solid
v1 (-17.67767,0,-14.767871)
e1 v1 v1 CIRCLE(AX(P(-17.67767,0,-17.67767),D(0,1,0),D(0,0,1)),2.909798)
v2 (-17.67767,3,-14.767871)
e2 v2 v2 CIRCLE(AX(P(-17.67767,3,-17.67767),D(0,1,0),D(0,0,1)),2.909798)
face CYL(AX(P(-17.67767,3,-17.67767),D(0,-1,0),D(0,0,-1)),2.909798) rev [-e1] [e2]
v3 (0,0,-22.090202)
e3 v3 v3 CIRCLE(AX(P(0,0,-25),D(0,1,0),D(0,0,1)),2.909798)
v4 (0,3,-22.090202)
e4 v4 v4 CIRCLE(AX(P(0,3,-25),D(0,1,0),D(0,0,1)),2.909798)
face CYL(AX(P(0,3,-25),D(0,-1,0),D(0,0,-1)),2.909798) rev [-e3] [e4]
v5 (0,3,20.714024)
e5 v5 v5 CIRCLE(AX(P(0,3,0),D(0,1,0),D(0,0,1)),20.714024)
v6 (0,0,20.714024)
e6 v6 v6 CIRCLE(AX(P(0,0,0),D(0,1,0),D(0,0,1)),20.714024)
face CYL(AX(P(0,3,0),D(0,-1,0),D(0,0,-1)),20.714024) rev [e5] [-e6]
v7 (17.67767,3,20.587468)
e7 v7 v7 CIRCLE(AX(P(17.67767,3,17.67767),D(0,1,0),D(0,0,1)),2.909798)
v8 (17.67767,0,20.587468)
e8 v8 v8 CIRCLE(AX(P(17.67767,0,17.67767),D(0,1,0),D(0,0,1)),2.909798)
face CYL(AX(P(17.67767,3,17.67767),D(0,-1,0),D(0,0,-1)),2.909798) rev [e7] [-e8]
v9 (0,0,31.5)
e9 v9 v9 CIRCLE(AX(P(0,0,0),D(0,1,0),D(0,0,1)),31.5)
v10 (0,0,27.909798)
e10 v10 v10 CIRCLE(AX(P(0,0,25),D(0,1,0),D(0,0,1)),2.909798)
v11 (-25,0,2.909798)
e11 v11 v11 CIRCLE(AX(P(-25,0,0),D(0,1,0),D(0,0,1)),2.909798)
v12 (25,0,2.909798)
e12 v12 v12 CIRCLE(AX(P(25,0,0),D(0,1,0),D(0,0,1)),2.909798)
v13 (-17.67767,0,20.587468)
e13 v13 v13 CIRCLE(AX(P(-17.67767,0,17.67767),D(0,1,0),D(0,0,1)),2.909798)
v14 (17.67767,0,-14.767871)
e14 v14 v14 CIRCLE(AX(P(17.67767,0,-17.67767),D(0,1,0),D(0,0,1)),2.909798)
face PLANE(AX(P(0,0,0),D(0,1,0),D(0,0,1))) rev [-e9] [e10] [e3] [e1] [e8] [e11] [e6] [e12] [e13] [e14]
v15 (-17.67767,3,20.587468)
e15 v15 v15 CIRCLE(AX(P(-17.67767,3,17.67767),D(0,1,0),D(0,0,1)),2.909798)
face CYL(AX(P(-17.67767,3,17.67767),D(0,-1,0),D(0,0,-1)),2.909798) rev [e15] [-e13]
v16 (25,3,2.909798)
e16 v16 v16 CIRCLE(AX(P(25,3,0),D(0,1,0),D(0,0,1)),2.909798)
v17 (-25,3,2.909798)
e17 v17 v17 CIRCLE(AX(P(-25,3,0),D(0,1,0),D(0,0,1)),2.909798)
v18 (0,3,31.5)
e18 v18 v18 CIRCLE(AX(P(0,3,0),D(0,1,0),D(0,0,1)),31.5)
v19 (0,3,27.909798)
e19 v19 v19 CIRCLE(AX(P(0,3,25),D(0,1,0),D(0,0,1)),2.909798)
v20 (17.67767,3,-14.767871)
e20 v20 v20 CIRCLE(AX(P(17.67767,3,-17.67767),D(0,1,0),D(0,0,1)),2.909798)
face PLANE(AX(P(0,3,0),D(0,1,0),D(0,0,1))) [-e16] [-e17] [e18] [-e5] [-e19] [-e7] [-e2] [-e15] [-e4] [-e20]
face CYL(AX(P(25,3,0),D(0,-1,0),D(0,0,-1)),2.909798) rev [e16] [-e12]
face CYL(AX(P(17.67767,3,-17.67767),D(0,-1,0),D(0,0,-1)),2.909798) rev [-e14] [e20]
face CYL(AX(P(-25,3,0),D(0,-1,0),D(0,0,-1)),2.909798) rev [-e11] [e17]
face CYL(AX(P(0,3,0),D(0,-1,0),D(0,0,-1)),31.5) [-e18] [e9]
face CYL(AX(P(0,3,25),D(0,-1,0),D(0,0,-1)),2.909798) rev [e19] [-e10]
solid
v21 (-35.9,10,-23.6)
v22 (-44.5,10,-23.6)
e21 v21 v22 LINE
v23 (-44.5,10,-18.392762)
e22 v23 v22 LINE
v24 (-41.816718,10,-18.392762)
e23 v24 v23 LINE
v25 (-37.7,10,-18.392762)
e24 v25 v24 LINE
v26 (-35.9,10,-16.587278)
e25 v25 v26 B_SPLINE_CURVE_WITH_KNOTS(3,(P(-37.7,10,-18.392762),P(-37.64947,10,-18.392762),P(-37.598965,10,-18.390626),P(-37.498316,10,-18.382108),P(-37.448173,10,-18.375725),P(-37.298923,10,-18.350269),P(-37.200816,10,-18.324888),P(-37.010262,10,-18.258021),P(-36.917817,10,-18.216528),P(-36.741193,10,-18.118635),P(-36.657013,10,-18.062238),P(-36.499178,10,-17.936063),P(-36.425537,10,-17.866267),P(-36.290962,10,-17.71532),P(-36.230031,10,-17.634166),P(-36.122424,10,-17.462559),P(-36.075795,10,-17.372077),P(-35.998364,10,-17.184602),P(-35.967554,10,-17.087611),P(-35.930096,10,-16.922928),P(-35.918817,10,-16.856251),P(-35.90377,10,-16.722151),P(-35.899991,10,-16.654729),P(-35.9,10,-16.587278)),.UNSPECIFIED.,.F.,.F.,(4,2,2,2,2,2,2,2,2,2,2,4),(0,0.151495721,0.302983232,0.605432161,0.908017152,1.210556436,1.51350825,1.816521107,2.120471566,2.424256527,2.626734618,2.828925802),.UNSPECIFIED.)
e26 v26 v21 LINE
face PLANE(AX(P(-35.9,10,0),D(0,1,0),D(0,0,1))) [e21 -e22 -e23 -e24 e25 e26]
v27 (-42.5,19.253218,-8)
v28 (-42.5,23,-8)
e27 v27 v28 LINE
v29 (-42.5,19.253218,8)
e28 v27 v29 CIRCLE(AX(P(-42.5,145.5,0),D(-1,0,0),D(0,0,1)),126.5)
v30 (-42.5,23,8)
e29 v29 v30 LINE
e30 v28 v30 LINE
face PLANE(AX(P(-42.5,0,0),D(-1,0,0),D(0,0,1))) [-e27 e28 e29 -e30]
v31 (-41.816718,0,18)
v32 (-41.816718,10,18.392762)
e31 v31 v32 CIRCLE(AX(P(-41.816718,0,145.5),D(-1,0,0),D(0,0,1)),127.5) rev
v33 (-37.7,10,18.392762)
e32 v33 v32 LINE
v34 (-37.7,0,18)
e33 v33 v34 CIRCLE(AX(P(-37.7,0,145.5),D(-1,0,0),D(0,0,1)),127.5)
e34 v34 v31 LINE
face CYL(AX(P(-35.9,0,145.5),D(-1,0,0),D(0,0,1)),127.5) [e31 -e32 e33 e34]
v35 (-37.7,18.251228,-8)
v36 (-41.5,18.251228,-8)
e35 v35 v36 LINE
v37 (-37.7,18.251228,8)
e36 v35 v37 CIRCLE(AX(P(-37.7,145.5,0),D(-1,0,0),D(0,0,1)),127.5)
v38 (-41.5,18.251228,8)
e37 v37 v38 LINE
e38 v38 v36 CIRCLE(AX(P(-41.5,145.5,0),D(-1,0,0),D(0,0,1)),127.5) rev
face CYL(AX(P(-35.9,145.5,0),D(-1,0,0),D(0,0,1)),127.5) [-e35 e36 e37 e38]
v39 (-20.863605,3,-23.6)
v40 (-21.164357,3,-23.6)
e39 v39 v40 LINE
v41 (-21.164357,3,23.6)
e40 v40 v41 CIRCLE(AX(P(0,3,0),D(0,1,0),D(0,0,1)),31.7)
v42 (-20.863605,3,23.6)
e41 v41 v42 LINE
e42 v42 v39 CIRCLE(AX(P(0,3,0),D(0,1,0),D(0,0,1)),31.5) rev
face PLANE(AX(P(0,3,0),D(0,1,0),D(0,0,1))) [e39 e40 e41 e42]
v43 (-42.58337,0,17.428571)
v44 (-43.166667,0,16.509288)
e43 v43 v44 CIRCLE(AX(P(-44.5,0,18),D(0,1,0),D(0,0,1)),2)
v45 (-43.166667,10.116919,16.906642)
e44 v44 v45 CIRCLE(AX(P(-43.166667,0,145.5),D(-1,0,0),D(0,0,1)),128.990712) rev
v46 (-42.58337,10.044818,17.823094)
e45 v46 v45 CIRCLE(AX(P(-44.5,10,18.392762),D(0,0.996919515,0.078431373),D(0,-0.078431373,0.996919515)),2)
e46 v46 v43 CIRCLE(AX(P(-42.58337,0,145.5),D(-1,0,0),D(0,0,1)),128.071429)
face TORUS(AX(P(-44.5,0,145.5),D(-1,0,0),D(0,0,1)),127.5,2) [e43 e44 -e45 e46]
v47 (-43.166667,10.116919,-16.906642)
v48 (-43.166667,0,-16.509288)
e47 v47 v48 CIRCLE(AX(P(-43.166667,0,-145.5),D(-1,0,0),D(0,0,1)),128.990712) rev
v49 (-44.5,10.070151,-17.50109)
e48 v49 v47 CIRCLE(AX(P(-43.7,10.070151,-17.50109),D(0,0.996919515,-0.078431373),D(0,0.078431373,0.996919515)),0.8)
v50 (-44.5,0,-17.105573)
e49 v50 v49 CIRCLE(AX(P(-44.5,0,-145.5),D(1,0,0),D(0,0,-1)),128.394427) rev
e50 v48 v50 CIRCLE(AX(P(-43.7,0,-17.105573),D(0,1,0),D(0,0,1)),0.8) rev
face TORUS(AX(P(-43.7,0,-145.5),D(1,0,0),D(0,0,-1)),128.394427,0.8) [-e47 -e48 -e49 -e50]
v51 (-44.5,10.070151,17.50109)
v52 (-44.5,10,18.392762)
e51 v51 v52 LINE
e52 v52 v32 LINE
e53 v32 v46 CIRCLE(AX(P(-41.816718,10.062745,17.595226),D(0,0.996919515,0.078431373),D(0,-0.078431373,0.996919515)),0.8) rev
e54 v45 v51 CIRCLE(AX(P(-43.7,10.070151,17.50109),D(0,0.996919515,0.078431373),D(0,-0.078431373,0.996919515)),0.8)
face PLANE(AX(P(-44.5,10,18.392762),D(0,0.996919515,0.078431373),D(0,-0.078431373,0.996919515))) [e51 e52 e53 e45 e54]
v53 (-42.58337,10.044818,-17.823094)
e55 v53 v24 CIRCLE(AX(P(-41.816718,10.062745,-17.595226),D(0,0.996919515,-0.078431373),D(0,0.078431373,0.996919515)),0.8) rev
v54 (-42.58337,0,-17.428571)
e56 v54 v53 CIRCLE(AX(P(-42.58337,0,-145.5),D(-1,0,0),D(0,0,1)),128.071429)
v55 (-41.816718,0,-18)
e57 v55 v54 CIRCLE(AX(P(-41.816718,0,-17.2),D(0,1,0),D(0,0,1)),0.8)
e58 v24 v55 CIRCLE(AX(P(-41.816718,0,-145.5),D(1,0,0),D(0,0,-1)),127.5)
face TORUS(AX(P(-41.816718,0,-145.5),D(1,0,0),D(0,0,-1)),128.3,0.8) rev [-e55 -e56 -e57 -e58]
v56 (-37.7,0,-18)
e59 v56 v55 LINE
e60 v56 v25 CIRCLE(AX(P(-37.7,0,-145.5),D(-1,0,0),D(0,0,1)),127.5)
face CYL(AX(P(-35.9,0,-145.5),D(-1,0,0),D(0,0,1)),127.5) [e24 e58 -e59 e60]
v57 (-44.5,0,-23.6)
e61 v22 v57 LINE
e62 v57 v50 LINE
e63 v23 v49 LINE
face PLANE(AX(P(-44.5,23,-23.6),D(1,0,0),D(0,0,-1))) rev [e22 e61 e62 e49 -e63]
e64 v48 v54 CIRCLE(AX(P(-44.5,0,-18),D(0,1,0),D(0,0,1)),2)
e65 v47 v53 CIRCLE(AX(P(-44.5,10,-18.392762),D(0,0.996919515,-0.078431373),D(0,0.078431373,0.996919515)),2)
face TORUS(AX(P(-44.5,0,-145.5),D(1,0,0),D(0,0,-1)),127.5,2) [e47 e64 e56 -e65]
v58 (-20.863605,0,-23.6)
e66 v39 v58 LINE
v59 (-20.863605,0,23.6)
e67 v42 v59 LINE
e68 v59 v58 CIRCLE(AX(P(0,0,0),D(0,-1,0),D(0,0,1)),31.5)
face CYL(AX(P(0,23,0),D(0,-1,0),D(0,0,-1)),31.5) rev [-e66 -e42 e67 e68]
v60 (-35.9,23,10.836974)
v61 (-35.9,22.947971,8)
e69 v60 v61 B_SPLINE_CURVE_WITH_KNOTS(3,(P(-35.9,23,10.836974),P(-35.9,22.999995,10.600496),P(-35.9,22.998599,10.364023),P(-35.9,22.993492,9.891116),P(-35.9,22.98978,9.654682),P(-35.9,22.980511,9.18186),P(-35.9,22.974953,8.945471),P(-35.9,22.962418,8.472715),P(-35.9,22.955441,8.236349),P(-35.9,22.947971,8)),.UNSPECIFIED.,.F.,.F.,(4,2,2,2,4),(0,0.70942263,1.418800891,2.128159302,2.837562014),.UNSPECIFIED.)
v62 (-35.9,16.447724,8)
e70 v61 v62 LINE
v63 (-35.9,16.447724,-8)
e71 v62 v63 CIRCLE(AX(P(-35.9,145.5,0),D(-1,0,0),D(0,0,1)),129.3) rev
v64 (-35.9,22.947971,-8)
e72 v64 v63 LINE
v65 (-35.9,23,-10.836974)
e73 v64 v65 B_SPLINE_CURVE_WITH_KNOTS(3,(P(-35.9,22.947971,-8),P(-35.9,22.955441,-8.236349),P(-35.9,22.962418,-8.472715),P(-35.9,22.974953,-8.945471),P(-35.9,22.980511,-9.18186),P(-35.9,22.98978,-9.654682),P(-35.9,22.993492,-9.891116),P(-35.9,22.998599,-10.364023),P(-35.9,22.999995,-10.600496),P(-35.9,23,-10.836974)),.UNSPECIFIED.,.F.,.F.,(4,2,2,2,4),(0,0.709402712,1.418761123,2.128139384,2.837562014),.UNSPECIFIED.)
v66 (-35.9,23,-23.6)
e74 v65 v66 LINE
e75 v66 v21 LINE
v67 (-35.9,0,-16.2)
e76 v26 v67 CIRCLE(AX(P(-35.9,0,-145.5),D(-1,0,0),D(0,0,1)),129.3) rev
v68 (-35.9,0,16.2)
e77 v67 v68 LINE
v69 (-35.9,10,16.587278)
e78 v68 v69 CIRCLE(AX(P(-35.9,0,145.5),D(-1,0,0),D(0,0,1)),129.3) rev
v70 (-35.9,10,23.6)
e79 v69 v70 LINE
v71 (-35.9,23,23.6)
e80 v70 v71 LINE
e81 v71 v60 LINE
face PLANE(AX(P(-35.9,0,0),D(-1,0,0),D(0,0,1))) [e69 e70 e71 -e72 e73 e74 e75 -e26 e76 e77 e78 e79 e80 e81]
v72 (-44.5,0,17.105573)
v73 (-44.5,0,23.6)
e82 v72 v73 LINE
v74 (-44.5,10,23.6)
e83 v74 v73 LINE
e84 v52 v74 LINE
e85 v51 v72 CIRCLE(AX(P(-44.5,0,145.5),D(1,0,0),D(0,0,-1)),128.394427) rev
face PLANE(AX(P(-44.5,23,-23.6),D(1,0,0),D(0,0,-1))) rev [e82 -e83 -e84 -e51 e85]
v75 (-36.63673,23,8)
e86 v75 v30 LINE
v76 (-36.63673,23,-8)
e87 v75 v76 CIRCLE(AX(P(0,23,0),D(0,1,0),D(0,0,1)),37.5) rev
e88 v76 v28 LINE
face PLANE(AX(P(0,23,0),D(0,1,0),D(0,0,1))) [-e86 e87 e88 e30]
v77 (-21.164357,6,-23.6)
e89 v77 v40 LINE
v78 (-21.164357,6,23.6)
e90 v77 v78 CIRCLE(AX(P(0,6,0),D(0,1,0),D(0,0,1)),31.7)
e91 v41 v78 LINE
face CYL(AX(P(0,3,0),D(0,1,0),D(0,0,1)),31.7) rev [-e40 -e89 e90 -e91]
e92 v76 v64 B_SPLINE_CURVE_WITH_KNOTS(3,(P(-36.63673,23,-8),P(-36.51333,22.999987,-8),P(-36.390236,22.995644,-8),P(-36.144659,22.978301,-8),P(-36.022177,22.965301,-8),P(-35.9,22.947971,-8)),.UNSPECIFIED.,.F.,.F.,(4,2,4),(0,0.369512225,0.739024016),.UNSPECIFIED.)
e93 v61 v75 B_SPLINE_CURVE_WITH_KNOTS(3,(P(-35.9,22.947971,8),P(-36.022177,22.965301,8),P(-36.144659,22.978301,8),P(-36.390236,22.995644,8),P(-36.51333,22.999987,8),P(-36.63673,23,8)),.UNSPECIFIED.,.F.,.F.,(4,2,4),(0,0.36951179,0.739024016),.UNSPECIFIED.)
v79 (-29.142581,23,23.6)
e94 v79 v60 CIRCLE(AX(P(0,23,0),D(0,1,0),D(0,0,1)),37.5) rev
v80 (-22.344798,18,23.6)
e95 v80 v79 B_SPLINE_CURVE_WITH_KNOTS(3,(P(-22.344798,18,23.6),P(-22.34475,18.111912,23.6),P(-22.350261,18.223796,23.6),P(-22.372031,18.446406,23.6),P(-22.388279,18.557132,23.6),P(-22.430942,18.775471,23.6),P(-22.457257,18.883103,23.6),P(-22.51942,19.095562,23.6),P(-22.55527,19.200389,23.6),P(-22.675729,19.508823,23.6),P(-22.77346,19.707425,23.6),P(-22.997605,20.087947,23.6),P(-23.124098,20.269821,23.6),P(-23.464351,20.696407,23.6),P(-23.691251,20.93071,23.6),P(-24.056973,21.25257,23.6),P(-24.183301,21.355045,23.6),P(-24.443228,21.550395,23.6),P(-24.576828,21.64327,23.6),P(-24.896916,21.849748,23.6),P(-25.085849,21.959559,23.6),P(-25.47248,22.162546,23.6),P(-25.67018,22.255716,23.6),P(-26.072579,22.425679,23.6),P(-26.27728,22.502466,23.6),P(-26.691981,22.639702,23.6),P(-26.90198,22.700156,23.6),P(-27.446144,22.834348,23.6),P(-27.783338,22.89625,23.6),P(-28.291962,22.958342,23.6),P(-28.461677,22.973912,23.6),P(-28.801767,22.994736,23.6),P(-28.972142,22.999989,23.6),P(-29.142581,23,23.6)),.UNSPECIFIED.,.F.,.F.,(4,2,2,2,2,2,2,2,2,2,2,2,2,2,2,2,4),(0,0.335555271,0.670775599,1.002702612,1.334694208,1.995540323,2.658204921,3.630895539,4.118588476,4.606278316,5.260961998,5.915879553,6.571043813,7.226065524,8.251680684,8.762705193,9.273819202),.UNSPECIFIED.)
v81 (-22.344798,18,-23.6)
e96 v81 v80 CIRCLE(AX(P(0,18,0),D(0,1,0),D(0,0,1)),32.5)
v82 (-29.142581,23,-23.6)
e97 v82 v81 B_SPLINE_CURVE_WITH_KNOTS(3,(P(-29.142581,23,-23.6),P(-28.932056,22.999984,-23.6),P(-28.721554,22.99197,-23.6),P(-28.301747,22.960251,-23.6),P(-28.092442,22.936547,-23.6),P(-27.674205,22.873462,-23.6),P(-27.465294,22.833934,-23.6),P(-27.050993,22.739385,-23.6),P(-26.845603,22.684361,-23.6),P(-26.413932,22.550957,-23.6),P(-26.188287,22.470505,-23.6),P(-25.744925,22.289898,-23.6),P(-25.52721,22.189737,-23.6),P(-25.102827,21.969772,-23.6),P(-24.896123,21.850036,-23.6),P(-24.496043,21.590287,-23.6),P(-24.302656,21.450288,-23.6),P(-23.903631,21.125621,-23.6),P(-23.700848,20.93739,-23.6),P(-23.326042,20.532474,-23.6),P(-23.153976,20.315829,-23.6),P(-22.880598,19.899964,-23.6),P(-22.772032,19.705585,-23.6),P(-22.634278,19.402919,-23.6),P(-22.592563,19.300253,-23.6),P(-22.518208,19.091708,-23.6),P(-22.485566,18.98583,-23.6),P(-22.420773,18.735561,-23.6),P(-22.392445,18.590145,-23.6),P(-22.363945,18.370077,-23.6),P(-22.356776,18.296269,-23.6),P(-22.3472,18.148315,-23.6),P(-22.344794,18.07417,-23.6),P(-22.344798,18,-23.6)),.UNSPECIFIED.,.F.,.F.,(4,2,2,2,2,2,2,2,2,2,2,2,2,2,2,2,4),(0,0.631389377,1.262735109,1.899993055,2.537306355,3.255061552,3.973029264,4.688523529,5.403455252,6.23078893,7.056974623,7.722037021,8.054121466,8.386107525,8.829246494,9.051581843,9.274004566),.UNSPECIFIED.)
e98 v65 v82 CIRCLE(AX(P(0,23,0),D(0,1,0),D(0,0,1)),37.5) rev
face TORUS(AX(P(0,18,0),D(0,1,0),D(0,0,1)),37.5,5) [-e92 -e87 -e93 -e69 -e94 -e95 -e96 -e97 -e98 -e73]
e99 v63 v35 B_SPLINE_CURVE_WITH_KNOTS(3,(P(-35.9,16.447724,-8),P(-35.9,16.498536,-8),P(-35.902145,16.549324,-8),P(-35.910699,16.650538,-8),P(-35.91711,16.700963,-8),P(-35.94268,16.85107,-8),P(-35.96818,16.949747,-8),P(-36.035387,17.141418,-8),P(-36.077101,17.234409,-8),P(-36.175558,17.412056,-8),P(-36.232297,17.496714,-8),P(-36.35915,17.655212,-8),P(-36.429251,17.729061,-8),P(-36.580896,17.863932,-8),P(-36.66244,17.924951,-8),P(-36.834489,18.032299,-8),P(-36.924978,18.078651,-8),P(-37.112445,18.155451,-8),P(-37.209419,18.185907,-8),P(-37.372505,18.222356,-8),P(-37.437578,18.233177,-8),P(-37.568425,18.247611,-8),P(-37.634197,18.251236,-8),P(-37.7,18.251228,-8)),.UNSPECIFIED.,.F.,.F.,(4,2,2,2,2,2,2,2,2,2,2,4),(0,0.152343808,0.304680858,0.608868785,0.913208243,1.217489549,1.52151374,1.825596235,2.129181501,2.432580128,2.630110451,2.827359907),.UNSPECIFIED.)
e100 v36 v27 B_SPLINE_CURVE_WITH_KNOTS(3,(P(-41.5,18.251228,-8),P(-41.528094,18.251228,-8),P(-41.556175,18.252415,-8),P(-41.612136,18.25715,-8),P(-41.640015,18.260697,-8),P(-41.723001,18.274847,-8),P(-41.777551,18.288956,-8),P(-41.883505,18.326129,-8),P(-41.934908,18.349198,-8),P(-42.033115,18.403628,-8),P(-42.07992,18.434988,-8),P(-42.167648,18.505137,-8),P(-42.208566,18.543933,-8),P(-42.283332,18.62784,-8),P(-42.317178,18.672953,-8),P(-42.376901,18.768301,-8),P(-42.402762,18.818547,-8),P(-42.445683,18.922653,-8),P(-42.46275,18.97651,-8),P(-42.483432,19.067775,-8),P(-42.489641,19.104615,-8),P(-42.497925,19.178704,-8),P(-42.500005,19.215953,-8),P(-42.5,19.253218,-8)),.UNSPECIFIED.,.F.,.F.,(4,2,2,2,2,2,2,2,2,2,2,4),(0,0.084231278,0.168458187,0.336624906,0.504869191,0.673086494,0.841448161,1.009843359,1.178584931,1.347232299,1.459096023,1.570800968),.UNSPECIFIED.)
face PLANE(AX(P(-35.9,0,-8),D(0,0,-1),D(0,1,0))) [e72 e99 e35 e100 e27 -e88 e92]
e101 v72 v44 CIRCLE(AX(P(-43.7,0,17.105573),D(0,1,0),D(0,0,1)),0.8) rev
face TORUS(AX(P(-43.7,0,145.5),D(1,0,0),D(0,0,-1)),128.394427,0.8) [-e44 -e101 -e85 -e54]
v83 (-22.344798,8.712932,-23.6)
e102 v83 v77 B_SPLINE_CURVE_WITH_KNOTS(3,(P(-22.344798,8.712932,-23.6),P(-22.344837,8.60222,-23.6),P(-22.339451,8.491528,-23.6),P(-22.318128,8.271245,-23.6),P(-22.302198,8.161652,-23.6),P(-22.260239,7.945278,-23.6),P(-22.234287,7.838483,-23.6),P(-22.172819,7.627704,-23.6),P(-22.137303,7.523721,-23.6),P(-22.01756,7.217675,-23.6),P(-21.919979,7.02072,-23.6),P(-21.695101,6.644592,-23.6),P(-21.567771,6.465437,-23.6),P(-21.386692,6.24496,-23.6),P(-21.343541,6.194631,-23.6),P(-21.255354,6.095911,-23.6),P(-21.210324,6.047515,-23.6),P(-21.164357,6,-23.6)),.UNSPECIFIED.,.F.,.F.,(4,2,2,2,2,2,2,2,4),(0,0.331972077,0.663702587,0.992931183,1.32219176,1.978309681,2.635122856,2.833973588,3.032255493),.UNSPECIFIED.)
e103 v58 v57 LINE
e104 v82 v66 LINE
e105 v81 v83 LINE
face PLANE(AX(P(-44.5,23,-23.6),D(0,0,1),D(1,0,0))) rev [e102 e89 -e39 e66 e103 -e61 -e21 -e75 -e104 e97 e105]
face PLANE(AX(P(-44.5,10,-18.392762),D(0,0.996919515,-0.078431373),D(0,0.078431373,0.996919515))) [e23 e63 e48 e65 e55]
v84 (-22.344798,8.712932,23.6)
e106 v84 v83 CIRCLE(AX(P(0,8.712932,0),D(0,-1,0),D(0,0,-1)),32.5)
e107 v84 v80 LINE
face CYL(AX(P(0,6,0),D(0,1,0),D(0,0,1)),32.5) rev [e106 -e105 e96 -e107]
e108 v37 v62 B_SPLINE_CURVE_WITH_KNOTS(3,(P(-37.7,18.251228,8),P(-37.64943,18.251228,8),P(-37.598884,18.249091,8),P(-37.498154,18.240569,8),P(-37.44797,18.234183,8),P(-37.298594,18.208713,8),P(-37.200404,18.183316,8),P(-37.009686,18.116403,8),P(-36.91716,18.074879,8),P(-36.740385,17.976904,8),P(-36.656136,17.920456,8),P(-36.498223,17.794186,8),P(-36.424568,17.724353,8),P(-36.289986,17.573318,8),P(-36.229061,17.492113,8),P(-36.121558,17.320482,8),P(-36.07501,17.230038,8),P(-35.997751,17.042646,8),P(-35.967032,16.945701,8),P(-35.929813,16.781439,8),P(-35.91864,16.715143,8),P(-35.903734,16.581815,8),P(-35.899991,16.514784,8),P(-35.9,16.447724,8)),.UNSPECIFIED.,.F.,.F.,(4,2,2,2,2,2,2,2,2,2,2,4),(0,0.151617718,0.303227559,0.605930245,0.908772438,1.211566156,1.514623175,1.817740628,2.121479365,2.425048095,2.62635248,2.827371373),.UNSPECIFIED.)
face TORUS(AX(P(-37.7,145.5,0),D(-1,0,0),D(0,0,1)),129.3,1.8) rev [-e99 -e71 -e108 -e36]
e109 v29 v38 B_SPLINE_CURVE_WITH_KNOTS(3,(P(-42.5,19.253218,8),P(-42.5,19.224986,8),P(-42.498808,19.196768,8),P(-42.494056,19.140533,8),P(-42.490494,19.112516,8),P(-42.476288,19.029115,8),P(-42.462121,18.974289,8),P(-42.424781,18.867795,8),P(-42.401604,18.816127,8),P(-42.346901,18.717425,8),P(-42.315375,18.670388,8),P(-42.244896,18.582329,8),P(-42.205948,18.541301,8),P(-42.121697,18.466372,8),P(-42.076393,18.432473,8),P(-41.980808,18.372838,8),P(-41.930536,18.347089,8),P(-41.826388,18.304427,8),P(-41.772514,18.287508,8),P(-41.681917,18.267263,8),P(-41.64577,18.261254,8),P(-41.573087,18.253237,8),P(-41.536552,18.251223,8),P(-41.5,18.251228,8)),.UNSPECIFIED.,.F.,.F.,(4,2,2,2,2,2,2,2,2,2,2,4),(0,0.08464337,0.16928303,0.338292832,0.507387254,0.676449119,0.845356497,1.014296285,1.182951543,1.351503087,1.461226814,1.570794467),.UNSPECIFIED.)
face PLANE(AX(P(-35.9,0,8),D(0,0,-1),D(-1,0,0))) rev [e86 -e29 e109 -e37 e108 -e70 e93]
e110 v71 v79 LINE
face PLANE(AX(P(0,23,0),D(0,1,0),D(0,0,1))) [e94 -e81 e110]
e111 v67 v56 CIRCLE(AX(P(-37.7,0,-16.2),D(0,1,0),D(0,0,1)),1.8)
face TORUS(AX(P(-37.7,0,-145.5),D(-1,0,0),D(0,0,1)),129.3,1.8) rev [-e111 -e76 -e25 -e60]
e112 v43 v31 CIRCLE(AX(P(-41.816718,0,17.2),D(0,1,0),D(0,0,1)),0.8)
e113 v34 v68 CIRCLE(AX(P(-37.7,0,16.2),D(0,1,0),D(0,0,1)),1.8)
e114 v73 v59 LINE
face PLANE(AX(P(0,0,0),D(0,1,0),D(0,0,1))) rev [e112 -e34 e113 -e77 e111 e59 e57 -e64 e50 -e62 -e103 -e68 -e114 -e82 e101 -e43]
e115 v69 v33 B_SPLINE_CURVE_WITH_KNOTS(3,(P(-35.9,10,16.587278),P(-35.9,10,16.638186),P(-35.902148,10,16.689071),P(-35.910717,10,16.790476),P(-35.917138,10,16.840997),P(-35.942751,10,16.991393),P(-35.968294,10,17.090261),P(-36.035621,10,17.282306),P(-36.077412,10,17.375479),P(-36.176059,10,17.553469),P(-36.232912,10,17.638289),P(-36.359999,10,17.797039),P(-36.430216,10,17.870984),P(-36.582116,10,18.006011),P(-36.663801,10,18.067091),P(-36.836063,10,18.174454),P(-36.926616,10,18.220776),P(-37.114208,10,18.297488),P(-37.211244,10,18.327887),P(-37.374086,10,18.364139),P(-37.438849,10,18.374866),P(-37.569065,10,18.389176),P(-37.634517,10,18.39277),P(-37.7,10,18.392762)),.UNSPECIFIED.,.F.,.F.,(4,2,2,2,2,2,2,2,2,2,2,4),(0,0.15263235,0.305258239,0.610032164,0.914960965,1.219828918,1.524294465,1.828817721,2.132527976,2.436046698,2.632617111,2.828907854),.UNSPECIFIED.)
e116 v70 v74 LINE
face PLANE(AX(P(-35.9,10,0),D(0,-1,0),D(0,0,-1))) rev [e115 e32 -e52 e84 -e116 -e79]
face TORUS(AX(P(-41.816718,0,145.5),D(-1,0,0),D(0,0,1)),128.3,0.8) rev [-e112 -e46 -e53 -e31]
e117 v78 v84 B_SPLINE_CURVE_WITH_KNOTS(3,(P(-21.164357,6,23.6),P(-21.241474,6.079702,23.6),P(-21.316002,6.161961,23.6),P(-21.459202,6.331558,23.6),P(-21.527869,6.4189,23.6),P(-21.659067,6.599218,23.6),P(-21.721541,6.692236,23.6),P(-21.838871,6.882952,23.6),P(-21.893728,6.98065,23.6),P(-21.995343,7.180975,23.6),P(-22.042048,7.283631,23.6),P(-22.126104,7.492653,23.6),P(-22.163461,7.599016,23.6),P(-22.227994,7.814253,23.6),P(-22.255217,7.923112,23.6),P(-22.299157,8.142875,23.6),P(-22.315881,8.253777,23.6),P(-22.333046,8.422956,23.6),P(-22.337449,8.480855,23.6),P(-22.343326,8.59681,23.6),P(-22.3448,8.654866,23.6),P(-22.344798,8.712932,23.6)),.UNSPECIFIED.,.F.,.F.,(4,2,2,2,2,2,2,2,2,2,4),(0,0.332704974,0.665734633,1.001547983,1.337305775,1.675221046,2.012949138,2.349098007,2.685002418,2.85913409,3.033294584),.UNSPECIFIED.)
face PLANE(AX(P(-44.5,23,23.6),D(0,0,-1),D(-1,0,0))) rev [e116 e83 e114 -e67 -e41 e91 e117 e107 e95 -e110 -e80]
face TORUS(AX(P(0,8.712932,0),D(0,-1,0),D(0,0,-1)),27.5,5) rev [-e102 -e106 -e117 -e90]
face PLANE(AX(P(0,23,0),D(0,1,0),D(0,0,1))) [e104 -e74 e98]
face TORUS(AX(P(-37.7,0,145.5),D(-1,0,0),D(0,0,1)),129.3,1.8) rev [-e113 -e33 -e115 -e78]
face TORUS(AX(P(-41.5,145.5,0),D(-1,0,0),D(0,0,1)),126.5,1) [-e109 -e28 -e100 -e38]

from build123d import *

# Parameters (mm, degrees)
SKETCH_1_R          = 31.5
SKETCH_1_R_2        = 20.714023716
SKETCH_1_R_3        = 2.909798399
EXTRUDE_1_DEPTH     = 3
EXTRUDE_2_DEPTH     = 23
CUT_EXTRUDE_1_DEPTH = 8.6
SKETCH_5_R          = 32.5
CUT_EXTRUDE_2_DEPTH = 17
FILLET_1_R          = 5
FILLET_2_R          = 1.8
FILLET_4_R          = 0.8
FILLET_5_R          = 0.8
SKETCH_8_W          = 38.793065546
SKETCH_8_H          = 19.973810534
CUT_EXTRUDE_3_DEPTH = 2
FILLET_6_R          = 1
SKETCH_9_R          = 31.7
CUT_EXTRUDE_4_DEPTH = 3
FILLET_7_R          = 5


with BuildPart() as part:
    # 草图1 → 凸台-拉伸1 (new body)
    with BuildSketch(Plane(origin=(0, 0, 0), x_dir=(1, 0, 0), z_dir=(0, 1, 0))):
        with Locations(Location((0, 0, 0), (0, 0, 270))):
            Circle(SKETCH_1_R)
        with Locations(Location((0, 0, 0), (0, 0, 270))):
            Circle(SKETCH_1_R_2, mode=Mode.SUBTRACT)
        with Locations(Location((0, -25, 0), (0, 0, 270))):
            Circle(SKETCH_1_R_3, mode=Mode.SUBTRACT)
        with Locations(Location((-17.67766953, -17.67766953, 0), (0, 0, 270))):
            Circle(SKETCH_1_R_3, mode=Mode.SUBTRACT)
        with Locations(Location((-25, 0, 0), (0, 0, 270))):
            Circle(SKETCH_1_R_3, mode=Mode.SUBTRACT)
        with Locations(Location((-17.67766953, 17.67766953, 0), (0, 0, 270))):
            Circle(SKETCH_1_R_3, mode=Mode.SUBTRACT)
        with Locations(Location((0, 25, 0), (0, 0, 270))):
            Circle(SKETCH_1_R_3, mode=Mode.SUBTRACT)
        with Locations(Location((17.67766953, 17.67766953, 0), (0, 0, 270))):
            Circle(SKETCH_1_R_3, mode=Mode.SUBTRACT)
        with Locations(Location((25, 0, 0), (0, 0, 270))):
            Circle(SKETCH_1_R_3, mode=Mode.SUBTRACT)
        with Locations(Location((17.67766953, -17.67766953, 0), (0, 0, 270))):
            Circle(SKETCH_1_R_3, mode=Mode.SUBTRACT)
    extrude(amount=EXTRUDE_1_DEPTH)


with BuildPart() as body_2:
    # 草图2 → 凸台-拉伸2 (new body)
    with BuildSketch(Plane(origin=(0, 0, 0), x_dir=(1, 0, 0), z_dir=(0, 1, 0))):
        with BuildLine():
            Line((-44.5, 23.6), (-44.5, -23.6))
            Line((-44.5, -23.6), (-20.863604674, -23.6))
            ThreePointArc((-20.863604674, -23.6), (-31.5, 0), (-20.863604674, 23.6))
            Line((-20.863604674, 23.6), (-44.5, 23.6))
        make_face()
    extrude(amount=EXTRUDE_2_DEPTH)

    # 草图3 → 切除-拉伸1 (cut)
    with BuildSketch(Plane.ZY.offset(44.5)):
        with BuildLine():
            Line((-8, 18.251227904), (-8, 23))
            Line((-8, 23), (-23.6, 23))
            Line((-23.6, 23), (-23.6, 10))
            Line((-23.6, 10), (-18.392761811, 10))
            ThreePointArc((-18.392761811, 10), (-18.098228291, 5.00385506), (-18, 0))
            Line((-18, 0), (18, 0))
            ThreePointArc((18, 0), (18.098228291, 5.00385506), (18.392761811, 10))
            Line((18.392761811, 10), (23.6, 10))
            Line((23.6, 10), (23.6, 23))
            Line((23.6, 23), (8, 23))
            Line((8, 23), (8, 18.251227904))
            ThreePointArc((8, 18.251227904), (0, 18), (-8, 18.251227904))
        make_face()
    extrude(amount=-CUT_EXTRUDE_1_DEPTH, mode=Mode.SUBTRACT)

    # 草图5 → 切除-拉伸2 (cut)
    with BuildSketch(Plane(origin=(0, 23, 0), x_dir=(1, 0, 0), z_dir=(0, 1, 0))):
        Circle(SKETCH_5_R)
    extrude(amount=-CUT_EXTRUDE_2_DEPTH, mode=Mode.SUBTRACT)

    # 圆角1
    # the kernel refuses this fillet: 5 mm, written as the material it takes off along each edge
    with BuildSketch(Plane(origin=(0, 23, 0), x_dir=(-0.3646941876618019, 0, -0.9311273540637169), z_dir=(0.9311273540637169, 0, -0.3646941876618019))) as fillet_1_piece_1:
        with BuildLine():
            CenterArc((32.5 + FILLET_1_R, -FILLET_1_R), FILLET_1_R, 90, 90)
            Line((32.5, -FILLET_1_R), (32.5, 0))
            Line((32.5, 0), (32.5 + FILLET_1_R, 0))
        make_face()
    revolve(axis=Axis((0, 23, 0), (0, 1, 0)), revolution_arc=137.222472588, mode=Mode.SUBTRACT)

    # 圆角2
    fillet_2_edges = [body_2.edges().sort_by_distance(p)[0] for p in [
        (-35.9, 5.00385506, 18.098228291),
        (-35.9, 5.00385506, -18.098228291),
        (-35.9, 18, 0),
    ]]
    fillet(fillet_2_edges, radius=FILLET_2_R)

    # 扫描1: sweep along a curve in space
    with BuildLine() as sweep_1_path:
        ThreePointArc((-44.5, 0, 18), (-44.5, 5.00385506, 18.098228291), (-44.5, 10, 18.392761811))
    # 草图6 → 扫描1 (sweep)
    with BuildSketch(Plane(origin=(0, 0, 0), x_dir=(1, 0, 0), z_dir=(0, 1, 0))):
        with BuildLine():
            Line((-44.5, -18), (-44.5, -16))
            ThreePointArc((-44.5, -16), (-43.085786438, -16.585786438), (-42.5, -18))
            Line((-42.5, -18), (-44.5, -18))
        make_face()
    sweep(path=sweep_1_path.line)

    # 扫描2: sweep along a curve in space
    with BuildLine() as sweep_2_path:
        ThreePointArc((-44.5, 0, -18), (-44.5, 5.00385506, -18.098228291), (-44.5, 10, -18.392761811))
    # 草图7 → 扫描2 (sweep)
    with BuildSketch(Plane(origin=(0, 0, 0), x_dir=(1, 0, 0), z_dir=(0, 1, 0))):
        with BuildLine():
            Line((-44.5, 18), (-44.5, 16))
            ThreePointArc((-44.5, 16), (-43.085786438, 16.585786438), (-42.5, 18))
            Line((-42.5, 18), (-44.5, 18))
        make_face()
    sweep(path=sweep_2_path.line)

    # 圆角4
    fillet_4_edges = [body_2.edges().sort_by_distance(p)[0] for p in [
        (-44.5, 5.082346904, 16.099769127),
        (-42.5, 5.00385506, -18.098228291),
        (-44.5, 5.082346904, -16.099769127),
    ]]
    fillet(fillet_4_edges, radius=FILLET_4_R)

    # 圆角5
    fillet_5_edges = [body_2.edges().sort_by_distance(p)[0] for p in [
        (-42.5, 5.00385506, 18.098228291),
    ]]
    fillet(fillet_5_edges, radius=FILLET_5_R)

    # 草图8 → 切除-拉伸3 (cut)
    with BuildSketch(Plane.ZY.offset(44.5)):
        with Locations((-8.315025409, 25.620375372)):
            Rectangle(SKETCH_8_W, SKETCH_8_H)
    extrude(amount=-CUT_EXTRUDE_3_DEPTH, mode=Mode.SUBTRACT)

    # 圆角6
    fillet_6_edges = [body_2.edges().sort_by_distance(p)[0] for p in [
        (-42.5, 18, 0),
    ]]
    fillet(fillet_6_edges, radius=FILLET_6_R)

    # 草图9 → 切除-拉伸4 (cut)
    with BuildSketch(Plane(origin=(0, 6, 0), x_dir=(1, 0, 0), z_dir=(0, 1, 0))):
        Circle(SKETCH_9_R)
    extrude(amount=-CUT_EXTRUDE_4_DEPTH, mode=Mode.SUBTRACT)

    # 圆角7
    # the kernel refuses this fillet: 5 mm, written as the material it adds along each edge
    with BuildSketch(Plane(origin=(0, 6, 0), x_dir=(-0.5220974400053939, 0, -0.8528858441431738), z_dir=(0.8528858441431738, 0, -0.5220974400053939))) as fillet_7_piece_1_section:
        with BuildLine():
            CenterArc((27.5, 2.712931993), FILLET_7_R, 327.140119621, 32.859880379)
            Line((31.7, 0), (31.784, -0.05425864))
            ThreePointArc((31.784, -0.05425864), (32.1, -0.1), (32.5, -0.1))
            Line((32.5, -0.1), (32.6, 0))
            Line((32.6, 0), (32.6, 2.712931993))
            Line((32.6, 2.712931993), (32.5, 2.712931993))
        make_face()
    fillet_7_piece_1 = revolve(axis=Axis((0, 6, 0), (0, 1, 0)), revolution_arc=117.053901852, mode=Mode.PRIVATE)
    fillet_7_piece_1 = split(fillet_7_piece_1, bisect_by=Plane(origin=(-32.332369632, 7.28794393, 23.6), z_dir=(0, 0, -1)), keep=Keep.TOP, mode=Mode.PRIVATE)
    fillet_7_piece_1 = split(fillet_7_piece_1, bisect_by=Plane(origin=(-32.332369632, 7.28794393, -23.6), z_dir=(0, 0, 1)), keep=Keep.TOP, mode=Mode.PRIVATE)
    add(fillet_7_piece_1)


solid = Compound([part.part, body_2.part])
